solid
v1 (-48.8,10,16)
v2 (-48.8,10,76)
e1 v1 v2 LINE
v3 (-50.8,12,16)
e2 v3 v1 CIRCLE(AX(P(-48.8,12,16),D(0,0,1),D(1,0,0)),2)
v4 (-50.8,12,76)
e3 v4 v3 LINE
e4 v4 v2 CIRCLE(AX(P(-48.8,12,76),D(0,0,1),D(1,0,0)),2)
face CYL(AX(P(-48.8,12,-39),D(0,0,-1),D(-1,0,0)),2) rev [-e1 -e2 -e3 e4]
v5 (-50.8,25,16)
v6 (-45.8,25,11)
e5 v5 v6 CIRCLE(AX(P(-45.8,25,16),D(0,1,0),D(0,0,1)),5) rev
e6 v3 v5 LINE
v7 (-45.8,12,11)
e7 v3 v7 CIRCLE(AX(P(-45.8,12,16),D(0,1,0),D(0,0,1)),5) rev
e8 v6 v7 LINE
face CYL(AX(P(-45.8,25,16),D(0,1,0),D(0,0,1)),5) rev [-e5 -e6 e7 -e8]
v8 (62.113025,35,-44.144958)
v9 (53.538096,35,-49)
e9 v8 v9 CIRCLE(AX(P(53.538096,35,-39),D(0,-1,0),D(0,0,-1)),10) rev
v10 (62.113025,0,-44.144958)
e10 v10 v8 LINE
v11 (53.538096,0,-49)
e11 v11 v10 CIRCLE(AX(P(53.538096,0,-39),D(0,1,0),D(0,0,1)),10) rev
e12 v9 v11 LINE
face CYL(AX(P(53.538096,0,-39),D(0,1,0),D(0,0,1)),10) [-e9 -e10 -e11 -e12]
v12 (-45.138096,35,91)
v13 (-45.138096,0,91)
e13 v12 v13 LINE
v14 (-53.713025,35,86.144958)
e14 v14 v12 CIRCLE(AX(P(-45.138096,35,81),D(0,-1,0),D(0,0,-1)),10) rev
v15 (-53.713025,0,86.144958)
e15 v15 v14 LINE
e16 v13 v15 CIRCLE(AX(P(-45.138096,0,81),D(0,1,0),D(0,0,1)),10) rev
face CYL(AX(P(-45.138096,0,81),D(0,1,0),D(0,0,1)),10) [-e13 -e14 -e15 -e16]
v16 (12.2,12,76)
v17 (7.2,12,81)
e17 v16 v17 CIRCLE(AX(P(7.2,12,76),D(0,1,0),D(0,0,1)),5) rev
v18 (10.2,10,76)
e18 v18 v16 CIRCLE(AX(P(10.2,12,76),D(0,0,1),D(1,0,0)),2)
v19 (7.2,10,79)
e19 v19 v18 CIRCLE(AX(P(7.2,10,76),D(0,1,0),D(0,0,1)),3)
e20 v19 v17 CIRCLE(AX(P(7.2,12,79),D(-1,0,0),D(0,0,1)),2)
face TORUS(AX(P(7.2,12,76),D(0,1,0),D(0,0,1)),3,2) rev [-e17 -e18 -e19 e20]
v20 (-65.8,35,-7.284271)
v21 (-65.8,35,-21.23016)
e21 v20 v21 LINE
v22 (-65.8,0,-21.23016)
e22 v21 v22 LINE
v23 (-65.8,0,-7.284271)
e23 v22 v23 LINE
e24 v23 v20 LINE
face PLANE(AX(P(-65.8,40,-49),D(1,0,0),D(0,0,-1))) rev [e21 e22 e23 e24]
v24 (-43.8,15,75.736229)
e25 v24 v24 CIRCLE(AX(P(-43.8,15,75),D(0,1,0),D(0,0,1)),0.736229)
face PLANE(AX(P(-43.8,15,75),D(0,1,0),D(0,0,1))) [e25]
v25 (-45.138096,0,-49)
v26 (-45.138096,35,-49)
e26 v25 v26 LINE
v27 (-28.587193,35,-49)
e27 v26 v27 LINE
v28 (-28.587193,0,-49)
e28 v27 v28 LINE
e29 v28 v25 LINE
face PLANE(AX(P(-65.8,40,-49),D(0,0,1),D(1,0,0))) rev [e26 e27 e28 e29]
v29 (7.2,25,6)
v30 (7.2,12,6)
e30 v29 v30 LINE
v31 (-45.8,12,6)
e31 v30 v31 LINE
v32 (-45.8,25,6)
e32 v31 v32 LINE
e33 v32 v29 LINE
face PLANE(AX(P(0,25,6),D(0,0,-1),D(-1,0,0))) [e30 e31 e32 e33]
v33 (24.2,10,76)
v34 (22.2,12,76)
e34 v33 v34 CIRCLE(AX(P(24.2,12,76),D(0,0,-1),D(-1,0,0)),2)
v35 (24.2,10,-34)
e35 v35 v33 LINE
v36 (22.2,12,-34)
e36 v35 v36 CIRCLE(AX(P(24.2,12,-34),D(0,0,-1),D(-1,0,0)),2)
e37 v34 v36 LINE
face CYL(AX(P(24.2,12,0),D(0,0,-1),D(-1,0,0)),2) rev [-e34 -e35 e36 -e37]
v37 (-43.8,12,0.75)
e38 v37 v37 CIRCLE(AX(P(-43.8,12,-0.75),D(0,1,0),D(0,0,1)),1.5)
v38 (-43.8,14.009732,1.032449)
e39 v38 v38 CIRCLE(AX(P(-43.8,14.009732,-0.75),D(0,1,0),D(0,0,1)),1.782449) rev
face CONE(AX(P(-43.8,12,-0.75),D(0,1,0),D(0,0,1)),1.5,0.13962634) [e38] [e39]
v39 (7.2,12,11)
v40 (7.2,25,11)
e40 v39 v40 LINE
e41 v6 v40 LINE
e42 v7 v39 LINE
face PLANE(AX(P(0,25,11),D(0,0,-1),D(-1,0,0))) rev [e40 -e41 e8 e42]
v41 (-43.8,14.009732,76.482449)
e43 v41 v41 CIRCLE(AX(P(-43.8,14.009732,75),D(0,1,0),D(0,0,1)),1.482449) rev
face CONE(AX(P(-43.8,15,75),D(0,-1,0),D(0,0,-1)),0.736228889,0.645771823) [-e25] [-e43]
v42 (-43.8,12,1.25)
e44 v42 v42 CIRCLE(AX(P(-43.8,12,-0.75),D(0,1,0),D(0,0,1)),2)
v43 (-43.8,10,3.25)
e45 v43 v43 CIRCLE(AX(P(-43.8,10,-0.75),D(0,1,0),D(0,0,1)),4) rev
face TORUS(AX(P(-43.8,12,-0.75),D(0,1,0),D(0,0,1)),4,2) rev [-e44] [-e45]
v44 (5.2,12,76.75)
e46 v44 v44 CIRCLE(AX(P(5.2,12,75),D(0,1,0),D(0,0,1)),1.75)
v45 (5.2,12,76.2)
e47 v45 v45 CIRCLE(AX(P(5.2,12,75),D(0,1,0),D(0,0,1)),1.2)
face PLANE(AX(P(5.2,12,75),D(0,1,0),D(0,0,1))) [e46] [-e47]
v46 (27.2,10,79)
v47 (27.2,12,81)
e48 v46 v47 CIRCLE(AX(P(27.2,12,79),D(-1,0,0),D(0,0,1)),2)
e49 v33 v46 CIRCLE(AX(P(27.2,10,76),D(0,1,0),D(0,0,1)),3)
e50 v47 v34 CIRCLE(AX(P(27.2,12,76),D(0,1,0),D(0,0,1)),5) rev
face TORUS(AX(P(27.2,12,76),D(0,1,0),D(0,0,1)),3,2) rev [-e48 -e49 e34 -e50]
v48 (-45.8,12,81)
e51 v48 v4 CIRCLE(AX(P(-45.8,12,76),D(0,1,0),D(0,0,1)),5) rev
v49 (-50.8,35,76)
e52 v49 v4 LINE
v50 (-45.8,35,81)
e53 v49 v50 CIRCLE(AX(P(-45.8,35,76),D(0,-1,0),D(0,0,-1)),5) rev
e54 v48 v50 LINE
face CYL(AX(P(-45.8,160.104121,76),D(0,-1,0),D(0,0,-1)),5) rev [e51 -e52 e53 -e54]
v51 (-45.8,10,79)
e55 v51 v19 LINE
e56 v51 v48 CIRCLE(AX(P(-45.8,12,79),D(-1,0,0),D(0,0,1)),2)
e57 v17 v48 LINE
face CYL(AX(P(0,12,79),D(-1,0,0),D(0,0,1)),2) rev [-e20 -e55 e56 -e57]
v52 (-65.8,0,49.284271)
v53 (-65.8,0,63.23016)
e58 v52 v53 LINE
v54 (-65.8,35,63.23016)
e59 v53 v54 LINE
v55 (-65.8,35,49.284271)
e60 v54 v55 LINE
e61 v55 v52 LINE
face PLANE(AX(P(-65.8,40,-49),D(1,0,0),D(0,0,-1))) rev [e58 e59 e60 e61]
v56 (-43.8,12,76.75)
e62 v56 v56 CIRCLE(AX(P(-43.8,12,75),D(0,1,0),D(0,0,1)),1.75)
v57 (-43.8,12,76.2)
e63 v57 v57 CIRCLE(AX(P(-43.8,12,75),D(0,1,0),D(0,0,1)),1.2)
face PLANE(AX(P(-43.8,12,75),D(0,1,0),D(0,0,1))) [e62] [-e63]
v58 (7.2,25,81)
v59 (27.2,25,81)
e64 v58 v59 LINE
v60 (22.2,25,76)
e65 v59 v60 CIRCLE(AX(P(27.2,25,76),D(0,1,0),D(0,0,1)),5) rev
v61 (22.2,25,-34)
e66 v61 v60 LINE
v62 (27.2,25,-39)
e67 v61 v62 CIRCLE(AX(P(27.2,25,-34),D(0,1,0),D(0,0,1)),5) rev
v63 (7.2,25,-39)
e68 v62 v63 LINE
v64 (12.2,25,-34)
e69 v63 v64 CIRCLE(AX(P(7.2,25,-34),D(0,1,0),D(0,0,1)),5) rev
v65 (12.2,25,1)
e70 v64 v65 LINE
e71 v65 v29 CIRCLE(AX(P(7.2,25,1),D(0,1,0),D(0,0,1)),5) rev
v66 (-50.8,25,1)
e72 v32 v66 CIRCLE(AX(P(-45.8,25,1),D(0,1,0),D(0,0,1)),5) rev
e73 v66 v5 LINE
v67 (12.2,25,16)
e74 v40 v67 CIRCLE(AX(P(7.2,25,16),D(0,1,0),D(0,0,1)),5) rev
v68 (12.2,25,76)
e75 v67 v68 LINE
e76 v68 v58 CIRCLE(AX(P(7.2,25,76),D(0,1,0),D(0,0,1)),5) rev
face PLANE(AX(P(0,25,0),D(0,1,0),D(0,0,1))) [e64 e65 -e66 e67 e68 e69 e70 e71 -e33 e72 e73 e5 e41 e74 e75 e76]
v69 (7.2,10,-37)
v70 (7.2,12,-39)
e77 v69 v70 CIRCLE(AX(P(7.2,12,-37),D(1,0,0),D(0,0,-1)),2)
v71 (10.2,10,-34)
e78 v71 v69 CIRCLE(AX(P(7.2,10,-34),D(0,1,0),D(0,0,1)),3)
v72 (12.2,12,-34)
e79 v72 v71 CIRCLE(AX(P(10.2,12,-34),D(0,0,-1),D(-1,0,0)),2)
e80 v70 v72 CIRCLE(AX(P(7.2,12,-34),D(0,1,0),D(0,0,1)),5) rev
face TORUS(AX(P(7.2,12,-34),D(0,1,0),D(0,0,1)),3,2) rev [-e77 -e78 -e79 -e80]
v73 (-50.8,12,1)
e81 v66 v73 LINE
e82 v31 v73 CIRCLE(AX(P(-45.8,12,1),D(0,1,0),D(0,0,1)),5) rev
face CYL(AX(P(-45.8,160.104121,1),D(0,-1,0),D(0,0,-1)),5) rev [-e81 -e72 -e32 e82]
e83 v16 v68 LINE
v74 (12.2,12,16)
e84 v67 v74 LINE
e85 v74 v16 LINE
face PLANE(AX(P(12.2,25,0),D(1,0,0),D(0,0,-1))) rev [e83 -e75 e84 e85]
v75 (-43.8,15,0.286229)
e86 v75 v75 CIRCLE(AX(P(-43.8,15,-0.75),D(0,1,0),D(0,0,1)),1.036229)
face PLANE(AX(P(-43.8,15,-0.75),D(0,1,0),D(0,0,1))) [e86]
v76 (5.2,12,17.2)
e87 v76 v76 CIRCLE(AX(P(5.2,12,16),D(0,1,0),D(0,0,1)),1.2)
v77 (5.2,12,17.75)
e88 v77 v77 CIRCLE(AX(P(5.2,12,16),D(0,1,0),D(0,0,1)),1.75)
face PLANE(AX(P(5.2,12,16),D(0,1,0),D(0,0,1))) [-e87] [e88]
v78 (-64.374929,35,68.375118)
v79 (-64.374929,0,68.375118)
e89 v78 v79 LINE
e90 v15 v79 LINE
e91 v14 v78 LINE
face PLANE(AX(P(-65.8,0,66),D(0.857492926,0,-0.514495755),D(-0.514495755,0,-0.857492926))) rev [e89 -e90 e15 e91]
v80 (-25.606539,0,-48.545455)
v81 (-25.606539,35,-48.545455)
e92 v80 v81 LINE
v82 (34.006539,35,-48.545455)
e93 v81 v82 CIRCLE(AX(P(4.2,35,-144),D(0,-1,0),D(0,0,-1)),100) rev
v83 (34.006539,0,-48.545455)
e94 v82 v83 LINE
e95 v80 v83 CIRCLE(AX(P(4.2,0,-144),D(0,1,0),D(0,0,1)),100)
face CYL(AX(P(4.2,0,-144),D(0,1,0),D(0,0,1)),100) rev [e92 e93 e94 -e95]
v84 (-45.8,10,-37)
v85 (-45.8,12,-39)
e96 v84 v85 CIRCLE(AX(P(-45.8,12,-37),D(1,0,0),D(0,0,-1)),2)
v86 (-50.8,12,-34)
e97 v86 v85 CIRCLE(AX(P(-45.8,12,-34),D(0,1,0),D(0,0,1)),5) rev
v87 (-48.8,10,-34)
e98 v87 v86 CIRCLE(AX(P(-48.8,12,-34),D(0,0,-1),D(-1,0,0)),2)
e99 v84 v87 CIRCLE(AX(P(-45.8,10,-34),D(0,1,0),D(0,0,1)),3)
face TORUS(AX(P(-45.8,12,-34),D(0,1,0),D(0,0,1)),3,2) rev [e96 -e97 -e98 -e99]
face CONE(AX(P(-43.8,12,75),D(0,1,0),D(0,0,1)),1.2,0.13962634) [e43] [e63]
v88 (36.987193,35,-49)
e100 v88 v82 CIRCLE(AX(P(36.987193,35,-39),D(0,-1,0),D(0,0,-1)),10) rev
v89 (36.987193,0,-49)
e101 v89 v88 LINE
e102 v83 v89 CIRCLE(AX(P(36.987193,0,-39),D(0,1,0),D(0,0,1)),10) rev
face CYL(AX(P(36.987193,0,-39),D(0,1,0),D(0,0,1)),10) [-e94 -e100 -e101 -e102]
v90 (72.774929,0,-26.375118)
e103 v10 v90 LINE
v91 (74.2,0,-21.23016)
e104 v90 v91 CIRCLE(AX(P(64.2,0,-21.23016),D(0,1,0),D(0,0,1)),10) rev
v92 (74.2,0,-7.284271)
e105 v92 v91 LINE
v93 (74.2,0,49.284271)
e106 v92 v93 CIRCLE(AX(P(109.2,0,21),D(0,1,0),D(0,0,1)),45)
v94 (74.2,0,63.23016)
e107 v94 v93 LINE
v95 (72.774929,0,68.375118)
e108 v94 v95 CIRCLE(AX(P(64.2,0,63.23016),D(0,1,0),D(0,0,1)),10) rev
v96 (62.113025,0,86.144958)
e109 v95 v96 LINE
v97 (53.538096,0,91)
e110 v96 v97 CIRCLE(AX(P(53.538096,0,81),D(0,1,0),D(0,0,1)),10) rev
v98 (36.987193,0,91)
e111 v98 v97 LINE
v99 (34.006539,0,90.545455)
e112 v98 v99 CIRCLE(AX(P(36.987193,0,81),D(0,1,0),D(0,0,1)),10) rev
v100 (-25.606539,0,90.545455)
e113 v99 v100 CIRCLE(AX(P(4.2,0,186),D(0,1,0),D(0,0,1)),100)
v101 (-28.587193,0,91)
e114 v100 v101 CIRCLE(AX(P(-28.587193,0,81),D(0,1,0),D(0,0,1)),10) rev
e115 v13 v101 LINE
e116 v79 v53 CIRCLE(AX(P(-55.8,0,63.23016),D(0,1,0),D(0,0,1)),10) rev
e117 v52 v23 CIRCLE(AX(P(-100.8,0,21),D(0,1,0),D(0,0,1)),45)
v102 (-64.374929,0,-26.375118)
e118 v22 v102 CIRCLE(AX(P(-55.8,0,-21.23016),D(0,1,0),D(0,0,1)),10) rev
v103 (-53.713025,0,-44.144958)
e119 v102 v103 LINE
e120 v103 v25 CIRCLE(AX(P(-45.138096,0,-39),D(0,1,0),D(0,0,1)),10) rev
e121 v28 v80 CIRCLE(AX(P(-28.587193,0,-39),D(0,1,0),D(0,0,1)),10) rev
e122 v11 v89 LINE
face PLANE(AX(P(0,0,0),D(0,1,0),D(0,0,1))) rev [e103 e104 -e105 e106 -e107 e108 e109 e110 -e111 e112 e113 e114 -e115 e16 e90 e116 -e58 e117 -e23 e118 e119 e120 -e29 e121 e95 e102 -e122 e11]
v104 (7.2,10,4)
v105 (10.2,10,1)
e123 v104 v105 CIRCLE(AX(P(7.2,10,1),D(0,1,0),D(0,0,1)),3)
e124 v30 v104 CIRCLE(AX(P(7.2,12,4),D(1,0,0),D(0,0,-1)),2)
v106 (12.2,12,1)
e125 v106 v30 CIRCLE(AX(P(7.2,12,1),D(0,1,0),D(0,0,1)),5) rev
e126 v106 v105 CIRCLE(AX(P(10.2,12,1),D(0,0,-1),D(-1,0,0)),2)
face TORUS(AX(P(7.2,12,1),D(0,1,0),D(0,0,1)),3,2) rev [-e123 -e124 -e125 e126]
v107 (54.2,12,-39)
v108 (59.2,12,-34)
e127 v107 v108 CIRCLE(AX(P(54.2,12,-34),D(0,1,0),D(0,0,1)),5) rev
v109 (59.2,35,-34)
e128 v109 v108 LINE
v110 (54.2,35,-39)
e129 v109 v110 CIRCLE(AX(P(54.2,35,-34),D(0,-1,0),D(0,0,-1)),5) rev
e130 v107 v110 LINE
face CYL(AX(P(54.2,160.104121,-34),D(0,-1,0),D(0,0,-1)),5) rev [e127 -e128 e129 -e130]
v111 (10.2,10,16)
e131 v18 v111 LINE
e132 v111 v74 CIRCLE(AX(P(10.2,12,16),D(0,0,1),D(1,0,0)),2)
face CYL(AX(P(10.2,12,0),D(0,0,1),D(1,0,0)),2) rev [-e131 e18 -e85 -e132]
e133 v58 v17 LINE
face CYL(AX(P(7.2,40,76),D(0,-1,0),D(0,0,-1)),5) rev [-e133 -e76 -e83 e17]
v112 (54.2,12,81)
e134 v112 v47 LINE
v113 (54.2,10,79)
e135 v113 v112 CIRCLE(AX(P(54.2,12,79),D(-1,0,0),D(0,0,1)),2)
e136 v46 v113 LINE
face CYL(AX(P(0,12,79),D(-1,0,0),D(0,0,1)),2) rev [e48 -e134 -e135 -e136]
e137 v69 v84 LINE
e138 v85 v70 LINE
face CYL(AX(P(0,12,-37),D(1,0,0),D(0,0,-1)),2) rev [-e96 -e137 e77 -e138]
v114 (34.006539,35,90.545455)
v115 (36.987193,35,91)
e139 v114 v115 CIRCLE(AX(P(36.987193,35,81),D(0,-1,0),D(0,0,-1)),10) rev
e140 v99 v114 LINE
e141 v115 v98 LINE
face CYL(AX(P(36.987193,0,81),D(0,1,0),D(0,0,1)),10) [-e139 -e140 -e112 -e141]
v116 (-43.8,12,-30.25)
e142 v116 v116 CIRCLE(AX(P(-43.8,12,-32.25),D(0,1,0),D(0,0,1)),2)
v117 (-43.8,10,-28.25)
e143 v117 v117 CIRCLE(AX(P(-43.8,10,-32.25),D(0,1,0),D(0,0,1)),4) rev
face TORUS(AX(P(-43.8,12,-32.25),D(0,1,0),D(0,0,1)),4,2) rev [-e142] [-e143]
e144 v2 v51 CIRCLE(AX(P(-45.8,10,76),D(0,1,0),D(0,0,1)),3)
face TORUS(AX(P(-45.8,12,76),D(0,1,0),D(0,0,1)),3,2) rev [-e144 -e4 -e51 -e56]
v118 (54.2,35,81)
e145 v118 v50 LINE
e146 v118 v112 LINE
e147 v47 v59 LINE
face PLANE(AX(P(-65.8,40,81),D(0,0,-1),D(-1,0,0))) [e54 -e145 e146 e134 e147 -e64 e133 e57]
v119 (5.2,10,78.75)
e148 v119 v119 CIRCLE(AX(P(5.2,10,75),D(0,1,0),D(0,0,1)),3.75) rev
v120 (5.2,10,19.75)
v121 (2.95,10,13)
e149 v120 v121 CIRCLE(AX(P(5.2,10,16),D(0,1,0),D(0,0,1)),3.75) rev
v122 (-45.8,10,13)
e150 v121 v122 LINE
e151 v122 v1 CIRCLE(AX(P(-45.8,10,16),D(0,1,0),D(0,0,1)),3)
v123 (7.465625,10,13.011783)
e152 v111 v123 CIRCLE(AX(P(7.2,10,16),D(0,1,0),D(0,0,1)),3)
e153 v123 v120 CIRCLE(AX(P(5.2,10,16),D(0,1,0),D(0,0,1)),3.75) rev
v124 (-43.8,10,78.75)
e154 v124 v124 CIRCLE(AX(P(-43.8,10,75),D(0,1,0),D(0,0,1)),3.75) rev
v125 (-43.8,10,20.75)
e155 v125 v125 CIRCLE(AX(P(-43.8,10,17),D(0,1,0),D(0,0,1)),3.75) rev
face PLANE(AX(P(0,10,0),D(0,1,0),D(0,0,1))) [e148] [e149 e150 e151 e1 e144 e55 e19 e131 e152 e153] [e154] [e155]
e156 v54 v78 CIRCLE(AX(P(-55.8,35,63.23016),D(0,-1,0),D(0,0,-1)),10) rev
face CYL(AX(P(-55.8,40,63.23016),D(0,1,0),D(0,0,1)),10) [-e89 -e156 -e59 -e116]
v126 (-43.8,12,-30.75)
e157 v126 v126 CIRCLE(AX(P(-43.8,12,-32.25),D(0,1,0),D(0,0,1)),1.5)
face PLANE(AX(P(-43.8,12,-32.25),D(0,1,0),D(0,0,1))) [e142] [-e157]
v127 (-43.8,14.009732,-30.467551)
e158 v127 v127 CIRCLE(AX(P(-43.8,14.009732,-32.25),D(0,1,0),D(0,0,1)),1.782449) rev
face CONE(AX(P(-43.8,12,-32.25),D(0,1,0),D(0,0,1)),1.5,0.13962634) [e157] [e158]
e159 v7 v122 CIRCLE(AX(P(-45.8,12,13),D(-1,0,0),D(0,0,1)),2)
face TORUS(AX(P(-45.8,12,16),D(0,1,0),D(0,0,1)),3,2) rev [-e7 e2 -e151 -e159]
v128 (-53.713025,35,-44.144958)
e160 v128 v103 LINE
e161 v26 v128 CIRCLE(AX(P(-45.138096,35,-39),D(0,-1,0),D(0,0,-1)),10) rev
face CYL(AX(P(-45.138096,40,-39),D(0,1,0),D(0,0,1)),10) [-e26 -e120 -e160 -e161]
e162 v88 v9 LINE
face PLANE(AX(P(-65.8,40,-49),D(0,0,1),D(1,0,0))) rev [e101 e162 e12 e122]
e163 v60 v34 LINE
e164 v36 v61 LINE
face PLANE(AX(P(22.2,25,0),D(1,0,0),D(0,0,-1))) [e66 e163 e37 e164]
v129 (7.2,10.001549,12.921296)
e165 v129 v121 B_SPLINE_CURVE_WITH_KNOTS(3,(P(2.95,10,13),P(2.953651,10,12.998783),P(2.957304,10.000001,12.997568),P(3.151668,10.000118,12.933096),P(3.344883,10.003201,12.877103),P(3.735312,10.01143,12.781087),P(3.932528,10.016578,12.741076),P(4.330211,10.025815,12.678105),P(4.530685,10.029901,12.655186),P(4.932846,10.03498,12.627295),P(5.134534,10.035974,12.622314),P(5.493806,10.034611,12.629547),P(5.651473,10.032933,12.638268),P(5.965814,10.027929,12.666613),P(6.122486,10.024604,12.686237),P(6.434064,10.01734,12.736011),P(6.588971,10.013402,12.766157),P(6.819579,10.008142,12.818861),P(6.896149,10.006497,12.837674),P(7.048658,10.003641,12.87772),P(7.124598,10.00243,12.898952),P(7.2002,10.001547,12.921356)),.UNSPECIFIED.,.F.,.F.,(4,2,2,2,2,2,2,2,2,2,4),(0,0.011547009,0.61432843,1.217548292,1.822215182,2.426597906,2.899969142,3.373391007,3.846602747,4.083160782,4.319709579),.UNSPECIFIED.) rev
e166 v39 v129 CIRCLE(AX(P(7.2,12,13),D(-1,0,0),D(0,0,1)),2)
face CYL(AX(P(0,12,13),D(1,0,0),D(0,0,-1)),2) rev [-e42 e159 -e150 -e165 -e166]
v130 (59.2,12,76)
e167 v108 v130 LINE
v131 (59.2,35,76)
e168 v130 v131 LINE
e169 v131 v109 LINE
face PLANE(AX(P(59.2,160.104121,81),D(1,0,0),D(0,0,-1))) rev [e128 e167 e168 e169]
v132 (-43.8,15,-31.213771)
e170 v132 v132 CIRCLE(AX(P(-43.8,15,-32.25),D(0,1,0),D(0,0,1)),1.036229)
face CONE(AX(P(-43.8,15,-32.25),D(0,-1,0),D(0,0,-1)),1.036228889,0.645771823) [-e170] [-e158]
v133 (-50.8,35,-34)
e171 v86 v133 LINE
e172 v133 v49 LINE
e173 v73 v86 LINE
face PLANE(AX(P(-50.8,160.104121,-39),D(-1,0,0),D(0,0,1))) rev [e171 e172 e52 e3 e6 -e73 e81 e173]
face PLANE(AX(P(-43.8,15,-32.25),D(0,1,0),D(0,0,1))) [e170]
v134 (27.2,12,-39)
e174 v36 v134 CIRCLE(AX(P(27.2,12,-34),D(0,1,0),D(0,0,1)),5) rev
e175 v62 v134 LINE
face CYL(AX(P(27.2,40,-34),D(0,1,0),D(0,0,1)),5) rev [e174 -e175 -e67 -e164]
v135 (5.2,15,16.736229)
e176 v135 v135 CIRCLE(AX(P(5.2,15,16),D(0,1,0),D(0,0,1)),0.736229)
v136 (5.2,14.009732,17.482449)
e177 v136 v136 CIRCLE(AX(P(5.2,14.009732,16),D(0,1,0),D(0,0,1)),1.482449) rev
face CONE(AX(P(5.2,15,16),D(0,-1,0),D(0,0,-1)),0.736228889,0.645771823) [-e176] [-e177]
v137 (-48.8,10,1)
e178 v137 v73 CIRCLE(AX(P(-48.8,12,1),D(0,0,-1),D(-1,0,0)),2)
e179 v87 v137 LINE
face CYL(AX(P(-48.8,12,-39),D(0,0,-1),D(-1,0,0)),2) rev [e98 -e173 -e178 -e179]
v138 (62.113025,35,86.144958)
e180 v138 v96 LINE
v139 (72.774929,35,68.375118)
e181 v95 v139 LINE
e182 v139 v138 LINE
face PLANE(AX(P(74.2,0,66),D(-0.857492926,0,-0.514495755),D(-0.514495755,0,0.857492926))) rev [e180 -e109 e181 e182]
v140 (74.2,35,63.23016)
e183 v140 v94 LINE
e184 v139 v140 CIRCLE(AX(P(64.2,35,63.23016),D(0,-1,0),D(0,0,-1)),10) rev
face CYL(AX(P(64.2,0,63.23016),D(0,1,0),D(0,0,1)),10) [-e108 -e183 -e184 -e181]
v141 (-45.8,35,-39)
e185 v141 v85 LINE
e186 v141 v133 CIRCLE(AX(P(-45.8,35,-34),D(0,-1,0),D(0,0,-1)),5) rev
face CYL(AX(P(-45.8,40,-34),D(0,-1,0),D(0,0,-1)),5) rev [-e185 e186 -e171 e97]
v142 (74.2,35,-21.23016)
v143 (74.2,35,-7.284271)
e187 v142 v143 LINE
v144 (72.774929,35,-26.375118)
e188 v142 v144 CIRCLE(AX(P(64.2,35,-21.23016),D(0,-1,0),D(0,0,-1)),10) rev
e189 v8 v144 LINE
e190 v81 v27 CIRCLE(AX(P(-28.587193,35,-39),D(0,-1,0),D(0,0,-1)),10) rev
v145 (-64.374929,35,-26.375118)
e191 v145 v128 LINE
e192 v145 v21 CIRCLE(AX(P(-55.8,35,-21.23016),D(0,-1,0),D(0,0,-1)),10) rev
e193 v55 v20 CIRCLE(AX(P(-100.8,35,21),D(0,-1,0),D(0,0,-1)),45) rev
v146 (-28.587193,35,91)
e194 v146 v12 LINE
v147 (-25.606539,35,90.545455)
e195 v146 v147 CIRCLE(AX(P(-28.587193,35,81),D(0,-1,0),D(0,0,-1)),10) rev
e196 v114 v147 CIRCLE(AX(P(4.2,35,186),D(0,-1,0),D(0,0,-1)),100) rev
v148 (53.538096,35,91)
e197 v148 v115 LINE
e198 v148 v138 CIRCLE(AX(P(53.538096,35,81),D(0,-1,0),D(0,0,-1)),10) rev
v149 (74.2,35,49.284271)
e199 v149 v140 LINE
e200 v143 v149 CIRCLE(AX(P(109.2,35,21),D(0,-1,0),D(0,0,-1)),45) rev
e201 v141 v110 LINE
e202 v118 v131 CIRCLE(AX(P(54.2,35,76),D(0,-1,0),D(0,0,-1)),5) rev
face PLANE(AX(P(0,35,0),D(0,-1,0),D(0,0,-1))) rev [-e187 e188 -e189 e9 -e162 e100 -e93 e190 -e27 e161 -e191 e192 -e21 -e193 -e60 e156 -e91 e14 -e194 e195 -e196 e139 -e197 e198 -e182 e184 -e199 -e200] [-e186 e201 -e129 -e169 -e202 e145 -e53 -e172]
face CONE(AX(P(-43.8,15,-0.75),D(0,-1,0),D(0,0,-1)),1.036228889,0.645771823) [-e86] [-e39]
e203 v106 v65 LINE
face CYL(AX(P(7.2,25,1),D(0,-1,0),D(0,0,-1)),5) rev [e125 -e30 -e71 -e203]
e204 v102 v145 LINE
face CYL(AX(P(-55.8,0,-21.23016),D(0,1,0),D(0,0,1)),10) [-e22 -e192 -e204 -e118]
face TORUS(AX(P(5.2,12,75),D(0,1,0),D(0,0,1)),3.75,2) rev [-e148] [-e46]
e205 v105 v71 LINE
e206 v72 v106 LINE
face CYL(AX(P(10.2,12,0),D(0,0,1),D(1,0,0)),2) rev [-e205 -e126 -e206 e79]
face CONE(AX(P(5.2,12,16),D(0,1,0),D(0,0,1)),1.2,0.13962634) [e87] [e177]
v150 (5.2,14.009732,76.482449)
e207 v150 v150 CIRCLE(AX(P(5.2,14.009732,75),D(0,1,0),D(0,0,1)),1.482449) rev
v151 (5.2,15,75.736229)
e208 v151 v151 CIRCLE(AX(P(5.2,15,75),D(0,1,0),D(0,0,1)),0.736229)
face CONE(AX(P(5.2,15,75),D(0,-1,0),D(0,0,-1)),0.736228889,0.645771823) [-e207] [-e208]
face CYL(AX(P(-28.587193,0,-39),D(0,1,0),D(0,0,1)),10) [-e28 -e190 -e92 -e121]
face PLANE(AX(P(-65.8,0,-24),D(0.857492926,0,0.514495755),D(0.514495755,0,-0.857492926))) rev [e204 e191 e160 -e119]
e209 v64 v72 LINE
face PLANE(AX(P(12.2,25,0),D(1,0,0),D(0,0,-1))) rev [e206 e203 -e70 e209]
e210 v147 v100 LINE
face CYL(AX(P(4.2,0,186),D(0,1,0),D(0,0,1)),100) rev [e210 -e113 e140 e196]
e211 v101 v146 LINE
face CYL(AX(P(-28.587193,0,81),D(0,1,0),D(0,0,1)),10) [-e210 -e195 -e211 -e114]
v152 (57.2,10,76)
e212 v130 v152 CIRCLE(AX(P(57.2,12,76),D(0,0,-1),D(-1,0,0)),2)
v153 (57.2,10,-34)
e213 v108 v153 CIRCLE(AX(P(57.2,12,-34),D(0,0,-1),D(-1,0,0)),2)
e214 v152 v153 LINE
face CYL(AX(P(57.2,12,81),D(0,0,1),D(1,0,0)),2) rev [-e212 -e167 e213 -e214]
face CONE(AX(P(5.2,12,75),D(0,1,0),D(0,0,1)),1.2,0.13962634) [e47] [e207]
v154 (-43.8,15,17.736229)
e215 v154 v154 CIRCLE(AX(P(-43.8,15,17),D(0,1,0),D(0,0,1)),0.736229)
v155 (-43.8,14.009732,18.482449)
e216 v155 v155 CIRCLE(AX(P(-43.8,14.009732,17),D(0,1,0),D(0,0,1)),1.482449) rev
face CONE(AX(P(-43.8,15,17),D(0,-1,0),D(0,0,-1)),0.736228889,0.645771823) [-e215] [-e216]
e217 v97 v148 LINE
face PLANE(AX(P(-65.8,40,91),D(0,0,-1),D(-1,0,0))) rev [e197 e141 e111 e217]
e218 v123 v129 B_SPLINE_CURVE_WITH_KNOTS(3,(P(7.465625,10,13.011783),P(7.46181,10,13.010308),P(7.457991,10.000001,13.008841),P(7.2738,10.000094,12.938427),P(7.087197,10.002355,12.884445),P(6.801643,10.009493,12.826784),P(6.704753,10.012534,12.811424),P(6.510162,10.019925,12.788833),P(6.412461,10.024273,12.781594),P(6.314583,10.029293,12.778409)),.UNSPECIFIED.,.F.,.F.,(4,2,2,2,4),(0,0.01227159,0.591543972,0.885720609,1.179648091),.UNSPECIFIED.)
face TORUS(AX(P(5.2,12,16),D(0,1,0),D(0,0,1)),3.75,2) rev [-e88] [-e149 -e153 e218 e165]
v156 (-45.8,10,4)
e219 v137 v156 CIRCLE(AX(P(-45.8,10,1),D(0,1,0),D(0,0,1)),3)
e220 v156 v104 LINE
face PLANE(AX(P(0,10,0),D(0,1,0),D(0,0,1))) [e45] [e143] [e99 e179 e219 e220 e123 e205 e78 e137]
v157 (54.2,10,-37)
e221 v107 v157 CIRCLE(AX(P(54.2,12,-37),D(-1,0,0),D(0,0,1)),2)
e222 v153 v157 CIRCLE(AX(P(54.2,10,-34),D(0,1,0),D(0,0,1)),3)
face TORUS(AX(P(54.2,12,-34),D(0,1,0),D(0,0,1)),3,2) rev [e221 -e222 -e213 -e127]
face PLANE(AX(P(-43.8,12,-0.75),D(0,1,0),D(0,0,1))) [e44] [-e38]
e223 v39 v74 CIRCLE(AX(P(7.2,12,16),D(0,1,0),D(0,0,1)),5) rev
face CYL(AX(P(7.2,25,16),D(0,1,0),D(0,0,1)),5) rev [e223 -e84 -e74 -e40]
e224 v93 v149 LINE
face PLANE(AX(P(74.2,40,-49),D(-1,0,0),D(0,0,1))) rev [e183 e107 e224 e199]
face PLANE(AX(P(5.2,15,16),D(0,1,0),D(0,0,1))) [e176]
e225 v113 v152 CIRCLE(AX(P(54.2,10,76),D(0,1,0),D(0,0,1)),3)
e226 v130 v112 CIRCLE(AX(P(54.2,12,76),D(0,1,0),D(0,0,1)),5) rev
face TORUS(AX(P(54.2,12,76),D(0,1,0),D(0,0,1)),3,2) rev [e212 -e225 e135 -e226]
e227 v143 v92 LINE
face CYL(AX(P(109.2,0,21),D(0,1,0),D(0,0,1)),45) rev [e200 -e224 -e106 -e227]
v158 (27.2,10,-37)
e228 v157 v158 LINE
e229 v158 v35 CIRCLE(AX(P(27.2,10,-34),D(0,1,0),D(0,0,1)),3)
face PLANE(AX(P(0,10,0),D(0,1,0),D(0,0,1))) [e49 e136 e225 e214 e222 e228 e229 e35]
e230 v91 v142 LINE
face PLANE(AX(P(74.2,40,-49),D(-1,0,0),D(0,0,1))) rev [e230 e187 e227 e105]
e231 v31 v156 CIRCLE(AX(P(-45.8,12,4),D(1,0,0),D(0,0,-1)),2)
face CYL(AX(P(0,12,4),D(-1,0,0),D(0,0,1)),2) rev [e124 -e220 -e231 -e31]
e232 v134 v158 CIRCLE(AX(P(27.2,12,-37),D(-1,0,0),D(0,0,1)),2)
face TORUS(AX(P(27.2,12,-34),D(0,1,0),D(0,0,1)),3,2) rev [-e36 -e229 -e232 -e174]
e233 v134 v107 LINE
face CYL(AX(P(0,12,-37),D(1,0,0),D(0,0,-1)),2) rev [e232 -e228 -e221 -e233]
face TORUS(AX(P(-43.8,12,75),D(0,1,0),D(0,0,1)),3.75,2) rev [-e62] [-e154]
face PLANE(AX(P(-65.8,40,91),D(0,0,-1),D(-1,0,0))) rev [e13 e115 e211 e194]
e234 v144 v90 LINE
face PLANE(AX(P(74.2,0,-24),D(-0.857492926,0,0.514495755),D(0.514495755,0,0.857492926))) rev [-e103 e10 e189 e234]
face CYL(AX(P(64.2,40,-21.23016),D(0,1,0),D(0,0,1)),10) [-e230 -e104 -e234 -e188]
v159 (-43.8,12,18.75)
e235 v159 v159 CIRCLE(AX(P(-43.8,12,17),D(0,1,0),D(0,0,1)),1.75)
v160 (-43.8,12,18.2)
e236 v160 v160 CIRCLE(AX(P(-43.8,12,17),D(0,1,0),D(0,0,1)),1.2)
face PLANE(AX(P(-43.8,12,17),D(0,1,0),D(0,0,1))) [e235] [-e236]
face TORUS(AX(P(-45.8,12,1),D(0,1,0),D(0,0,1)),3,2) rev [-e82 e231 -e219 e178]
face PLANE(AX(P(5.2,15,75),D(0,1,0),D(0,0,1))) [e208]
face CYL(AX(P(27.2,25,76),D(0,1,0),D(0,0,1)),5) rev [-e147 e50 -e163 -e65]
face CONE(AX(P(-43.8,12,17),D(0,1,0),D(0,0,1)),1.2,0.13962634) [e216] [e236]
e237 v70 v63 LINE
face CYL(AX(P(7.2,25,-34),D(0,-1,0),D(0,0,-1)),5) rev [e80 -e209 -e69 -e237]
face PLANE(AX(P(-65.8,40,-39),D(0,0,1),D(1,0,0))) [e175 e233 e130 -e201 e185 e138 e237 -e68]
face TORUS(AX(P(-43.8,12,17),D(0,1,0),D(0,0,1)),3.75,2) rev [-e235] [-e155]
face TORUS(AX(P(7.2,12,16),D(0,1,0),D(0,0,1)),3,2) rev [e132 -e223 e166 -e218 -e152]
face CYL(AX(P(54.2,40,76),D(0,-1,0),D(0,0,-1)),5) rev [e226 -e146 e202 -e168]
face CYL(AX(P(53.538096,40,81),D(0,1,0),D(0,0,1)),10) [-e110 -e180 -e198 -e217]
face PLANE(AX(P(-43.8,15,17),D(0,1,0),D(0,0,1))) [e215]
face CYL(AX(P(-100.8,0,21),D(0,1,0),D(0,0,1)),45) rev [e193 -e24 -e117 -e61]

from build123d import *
from OCP.BRepFilletAPI import BRepFilletAPI_MakeChamfer

# Parameters (mm, degrees)
SKETCH1_W                     = 140
SKETCH1_H                     = 140
BOSS_EXTRUDE1_DEPTH           = 40
SHELL3_T                      = -10
SKETCH3_W                     = 5
SKETCH3_H                     = 120
BOSS_EXTRUDE2_DEPTH           = 30
CUT_EXTRUDE1_DEPTH            = 40
FILLET1_R                     = 10
SKETCH5_R                     = 45
SKETCH5_R_2                   = 100
CUT_EXTRUDE4_DEPTH            = 40
FILLET2_R                     = 10
SKETCH6_W                     = 63
SKETCH6_H                     = 5
BOSS_EXTRUDE3_DEPTH           = 15
FILLET4_R                     = 5
SKETCH7_R                     = 1.75
SKETCH7_R_2                   = 2
BOSS_EXTRUDE4_DEPTH           = 2
SKETCH8_R                     = 1.5
BOSS_EXTRUDE5_DEPTH           = 3
BOSS_EXTRUDE5_DRAFT           = -8
BOSS_EXTRUDE5_PROFILE_2_DEPTH = 3
BOSS_EXTRUDE5_PROFILE_2_DRAFT = -8
SKETCH8_R_2                   = 1.2
BOSS_EXTRUDE5_PROFILE_3_DEPTH = 3
BOSS_EXTRUDE5_PROFILE_3_DRAFT = -8
BOSS_EXTRUDE5_PROFILE_4_DEPTH = 3
BOSS_EXTRUDE5_PROFILE_4_DRAFT = -8
BOSS_EXTRUDE5_PROFILE_5_DEPTH = 3
BOSS_EXTRUDE5_PROFILE_5_DRAFT = -8
BOSS_EXTRUDE5_PROFILE_6_DEPTH = 3
BOSS_EXTRUDE5_PROFILE_6_DRAFT = -8
CHAMFER1_SIZE                 = 1
CHAMFER1_SIZE2                = 0.885393615
FILLET7_R                     = 2
CUT_EXTRUDE5_DEPTH            = 5


with BuildPart() as part:
    # Sketch1 → Boss-Extrude1 (new body)
    with BuildSketch(Plane(origin=(0, 0, 0), x_dir=(1, 0, 0), z_dir=(0, 1, 0))):
        with Locations((4.2, -21)):
            Rectangle(SKETCH1_W, SKETCH1_H)
    extrude(amount=BOSS_EXTRUDE1_DEPTH)

    # Shell3
    shell3_openings = [part.faces().sort_by_distance(p)[0] for p in [
        (4.2, 40, 21),
    ]]
    offset(amount=SHELL3_T, openings=shell3_openings, kind=Kind.INTERSECTION)

    # Sketch3 → Boss-Extrude2 (add)
    with BuildSketch(Plane(origin=(0, 10, 0), x_dir=(1, 0, 0), z_dir=(0, 1, 0))):
        with Locations((-53.3, -21)):
            Rectangle(SKETCH3_W, SKETCH3_H)
        with Locations((61.7, -21)):
            Rectangle(SKETCH3_W, SKETCH3_H)
    extrude(amount=BOSS_EXTRUDE2_DEPTH)

    # Sketch4 → Cut-Extrude1 (cut)
    with BuildSketch(Plane(origin=(0, 40, 0), x_dir=(1, 0, 0), z_dir=(0, 1, 0))):
        Polygon((-65.8, 24), (-50.8, 49), (-65.8, 49), align=None)
        Polygon((59.2, 49), (74.2, 49), (74.2, 24), align=None)
        Polygon((74.2, -91), (74.2, -66), (59.2, -91), align=None)
        Polygon((-65.8, -66), (-50.8, -91), (-65.8, -91), align=None)
    extrude(amount=-CUT_EXTRUDE1_DEPTH, mode=Mode.SUBTRACT)

    # Fillet1
    fillet1_edges = [part.edges().sort_by_distance(p)[0] for p in [
        (-65.8, 20, -24),
        (-50.8, 20, -49),
        (74.2, 20, -24),
        (59.2, 20, -49),
        (59.2, 20, 91),
        (74.2, 20, 66),
        (-65.8, 20, 66),
        (-50.8, 20, 91),
    ]]
    fillet(fillet1_edges, radius=FILLET1_R)

    # Sketch5 → Cut-Extrude4 (cut)
    with BuildSketch(Plane(origin=(0, 40, 0), x_dir=(1, 0, 0), z_dir=(0, 1, 0))):
        with Locations((-100.8, -21)):
            Circle(SKETCH5_R)
        with Locations((109.2, -21)):
            Circle(SKETCH5_R)
        with Locations((4.2, 144)):
            Circle(SKETCH5_R_2)
        with Locations((4.2, -186)):
            Circle(SKETCH5_R_2)
    extrude(amount=-CUT_EXTRUDE4_DEPTH, mode=Mode.SUBTRACT)

    # Fillet2
    fillet2_edges = [part.edges().sort_by_distance(p)[0] for p in [
        (35.424989992, 20, -49),
        (-27.024989992, 20, -49),
        (-27.024989992, 20, 91),
        (35.424989992, 20, 91),
    ]]
    fillet(fillet2_edges, radius=FILLET2_R)

    # Sketch6 → Boss-Extrude3 (add)
    with BuildSketch(Plane(origin=(0, 10, 0), x_dir=(1, 0, 0), z_dir=(0, 1, 0))):
        with Locations((-19.3, -8.5)):
            Rectangle(SKETCH6_W, SKETCH6_H)
        Polygon((12.2, 39), (12.2, -6), (12.2, -11), (12.2, -81), (22.2, -81), (22.2, 39), align=None)
    extrude(amount=BOSS_EXTRUDE3_DEPTH)

    # Fillet4
    fillet4_edges = [part.edges().sort_by_distance(p)[0] for p in [
        (-50.8, 17.5, 11),
        (12.2, 17.5, 11),
        (12.2, 17.5, 81),
        (22.2, 17.5, 81),
        (22.2, 17.5, -39),
        (12.2, 17.5, -39),
        (12.2, 17.5, 6),
        (-50.8, 17.5, 6),
        (-50.8, 25, 81),
        (-50.8, 25, -39),
        (59.2, 25, -39),
        (59.2, 25, 81),
    ]]
    fillet(fillet4_edges, radius=FILLET4_R)

    # Sketch7 → Boss-Extrude4 (add)
    with BuildSketch(Plane(origin=(0, 10, 0), x_dir=(1, 0, 0), z_dir=(0, 1, 0))):
        with Locations(Location((-43.8, -75, 0), (0, 0, 270))):
            Circle(SKETCH7_R)
        with Locations(Location((5.2, -75, 0), (0, 0, 270))):
            Circle(SKETCH7_R)
        with Locations(Location((-43.8, -17, 0), (0, 0, 270))):
            Circle(SKETCH7_R)
        with Locations(Location((5.2, -16, 0), (0, 0, 270))):
            Circle(SKETCH7_R)
        with Locations(Location((-43.8, 0.75, 0), (0, 0, 270))):
            Circle(SKETCH7_R_2)
        with Locations(Location((-43.8, 32.25, 0), (0, 0, 270))):
            Circle(SKETCH7_R_2)
    extrude(amount=BOSS_EXTRUDE4_DEPTH)


with BuildPart() as boss_extrude5_tool:
    # Sketch8 → Boss-Extrude5 (with draft: the straight prism first)
    with BuildSketch(Plane(origin=(0, 12, 0), x_dir=(1, 0, 0), z_dir=(0, 1, 0))):
        with Locations((-43.8, 32.25)):
            Circle(SKETCH8_R)
    extrude(amount=BOSS_EXTRUDE5_DEPTH)
    # Boss-Extrude5: the draft: its side faces are tilted about the plane it starts from
    boss_extrude5_sides = [boss_extrude5_tool.faces().sort_by_distance(p)[0] for p in [
        (-45.3, 13.5, -32.25),
    ]]
    draft(boss_extrude5_sides, Plane(origin=(0, 12, 0), x_dir=(1, 0, 0), z_dir=(0, 1, 0)), BOSS_EXTRUDE5_DRAFT)


with BuildPart() as part_1:
    add(part.part)

    # Boss-Extrude5: add boss_extrude5_tool
    add(boss_extrude5_tool.part)


with BuildPart() as boss_extrude5_profile_2_tool:
    # Sketch8 → Boss-Extrude5 profile 2 (with draft: the straight prism first)
    with BuildSketch(Plane(origin=(0, 12, 0), x_dir=(1, 0, 0), z_dir=(0, 1, 0))):
        with Locations((-43.8, 0.75)):
            Circle(SKETCH8_R)
    extrude(amount=BOSS_EXTRUDE5_PROFILE_2_DEPTH)
    # Boss-Extrude5 profile 2: the draft: its side faces are tilted about the plane it starts from
    boss_extrude5_profile_2_sides = [boss_extrude5_profile_2_tool.faces().sort_by_distance(p)[0] for p in [
        (-45.3, 13.5, -0.75),
    ]]
    draft(boss_extrude5_profile_2_sides, Plane(origin=(0, 12, 0), x_dir=(1, 0, 0), z_dir=(0, 1, 0)), BOSS_EXTRUDE5_PROFILE_2_DRAFT)


with BuildPart() as part_2:
    add(part_1.part)

    # Boss-Extrude5 profile 2: add boss_extrude5_profile_2_tool
    add(boss_extrude5_profile_2_tool.part)


with BuildPart() as boss_extrude5_profile_3_tool:
    # Sketch8 → Boss-Extrude5 profile 3 (with draft: the straight prism first)
    with BuildSketch(Plane(origin=(0, 12, 0), x_dir=(1, 0, 0), z_dir=(0, 1, 0))):
        with Locations((-43.8, -17)):
            Circle(SKETCH8_R_2)
    extrude(amount=BOSS_EXTRUDE5_PROFILE_3_DEPTH)
    # Boss-Extrude5 profile 3: the draft: its side faces are tilted about the plane it starts from
    boss_extrude5_profile_3_sides = [boss_extrude5_profile_3_tool.faces().sort_by_distance(p)[0] for p in [
        (-45, 13.5, 17),
    ]]
    draft(boss_extrude5_profile_3_sides, Plane(origin=(0, 12, 0), x_dir=(1, 0, 0), z_dir=(0, 1, 0)), BOSS_EXTRUDE5_PROFILE_3_DRAFT)


with BuildPart() as part_3:
    add(part_2.part)

    # Boss-Extrude5 profile 3: add boss_extrude5_profile_3_tool
    add(boss_extrude5_profile_3_tool.part)


with BuildPart() as boss_extrude5_profile_4_tool:
    # Sketch8 → Boss-Extrude5 profile 4 (with draft: the straight prism first)
    with BuildSketch(Plane(origin=(0, 12, 0), x_dir=(1, 0, 0), z_dir=(0, 1, 0))):
        with Locations((5.2, -16)):
            Circle(SKETCH8_R_2)
    extrude(amount=BOSS_EXTRUDE5_PROFILE_4_DEPTH)
    # Boss-Extrude5 profile 4: the draft: its side faces are tilted about the plane it starts from
    boss_extrude5_profile_4_sides = [boss_extrude5_profile_4_tool.faces().sort_by_distance(p)[0] for p in [
        (4, 13.5, 16),
    ]]
    draft(boss_extrude5_profile_4_sides, Plane(origin=(0, 12, 0), x_dir=(1, 0, 0), z_dir=(0, 1, 0)), BOSS_EXTRUDE5_PROFILE_4_DRAFT)


with BuildPart() as part_4:
    add(part_3.part)

    # Boss-Extrude5 profile 4: add boss_extrude5_profile_4_tool
    add(boss_extrude5_profile_4_tool.part)


with BuildPart() as boss_extrude5_profile_5_tool:
    # Sketch8 → Boss-Extrude5 profile 5 (with draft: the straight prism first)
    with BuildSketch(Plane(origin=(0, 12, 0), x_dir=(1, 0, 0), z_dir=(0, 1, 0))):
        with Locations((5.2, -75)):
            Circle(SKETCH8_R_2)
    extrude(amount=BOSS_EXTRUDE5_PROFILE_5_DEPTH)
    # Boss-Extrude5 profile 5: the draft: its side faces are tilted about the plane it starts from
    boss_extrude5_profile_5_sides = [boss_extrude5_profile_5_tool.faces().sort_by_distance(p)[0] for p in [
        (4, 13.5, 75),
    ]]
    draft(boss_extrude5_profile_5_sides, Plane(origin=(0, 12, 0), x_dir=(1, 0, 0), z_dir=(0, 1, 0)), BOSS_EXTRUDE5_PROFILE_5_DRAFT)


with BuildPart() as part_5:
    add(part_4.part)

    # Boss-Extrude5 profile 5: add boss_extrude5_profile_5_tool
    add(boss_extrude5_profile_5_tool.part)


with BuildPart() as boss_extrude5_profile_6_tool:
    # Sketch8 → Boss-Extrude5 profile 6 (with draft: the straight prism first)
    with BuildSketch(Plane(origin=(0, 12, 0), x_dir=(1, 0, 0), z_dir=(0, 1, 0))):
        with Locations((-43.8, -75)):
            Circle(SKETCH8_R_2)
    extrude(amount=BOSS_EXTRUDE5_PROFILE_6_DEPTH)
    # Boss-Extrude5 profile 6: the draft: its side faces are tilted about the plane it starts from
    boss_extrude5_profile_6_sides = [boss_extrude5_profile_6_tool.faces().sort_by_distance(p)[0] for p in [
        (-45, 13.5, 75),
    ]]
    draft(boss_extrude5_profile_6_sides, Plane(origin=(0, 12, 0), x_dir=(1, 0, 0), z_dir=(0, 1, 0)), BOSS_EXTRUDE5_PROFILE_6_DRAFT)


with BuildPart() as part_6:
    add(part_5.part)

    # Boss-Extrude5 profile 6: add boss_extrude5_profile_6_tool
    add(boss_extrude5_profile_6_tool.part)

    # Chamfer1: one chamfer whose edges measure the first distance from different faces: ONE call of the kernel's chamfer builder (chamfer() names one face for all edges)
    chamfer1_edges_1 = [part_6.edges().sort_by_distance(p)[0] for p in [
        (-45.721622504, 15, -32.25),
    ]]
    chamfer1_side_1 = [part_6.faces().sort_by_distance(p)[0] for p in [
        (-45.510811252, 13.5, -32.25),
    ]]
    chamfer1_edges_2 = [part_6.edges().sort_by_distance(p)[0] for p in [
        (-45.721622504, 15, -0.75),
    ]]
    chamfer1_side_2 = [part_6.faces().sort_by_distance(p)[0] for p in [
        (-45.510811252, 13.5, -0.75),
    ]]
    chamfer1_edges_3 = [part_6.edges().sort_by_distance(p)[0] for p in [
        (-45.421622504, 15, 17),
    ]]
    chamfer1_side_3 = [part_6.faces().sort_by_distance(p)[0] for p in [
        (-45.210811252, 13.5, 17),
    ]]
    chamfer1_edges_4 = [part_6.edges().sort_by_distance(p)[0] for p in [
        (3.578377496, 15, 16),
    ]]
    chamfer1_side_4 = [part_6.faces().sort_by_distance(p)[0] for p in [
        (3.789188748, 13.5, 16),
    ]]
    chamfer1_edges_5 = [part_6.edges().sort_by_distance(p)[0] for p in [
        (3.578377496, 15, 75),
    ]]
    chamfer1_side_5 = [part_6.faces().sort_by_distance(p)[0] for p in [
        (3.789188748, 13.5, 75),
    ]]
    chamfer1_edges_6 = [part_6.edges().sort_by_distance(p)[0] for p in [
        (-45.421622504, 15, 75),
    ]]
    chamfer1_side_6 = [part_6.faces().sort_by_distance(p)[0] for p in [
        (-45.210811252, 13.5, 75),
    ]]
    chamfer1 = BRepFilletAPI_MakeChamfer(part_6.part.solid().wrapped)
    for e in chamfer1_edges_1:
        chamfer1.Add(CHAMFER1_SIZE, CHAMFER1_SIZE2, e.wrapped, chamfer1_side_1[0].wrapped)  # the first distance lies on this face
    for e in chamfer1_edges_2:
        chamfer1.Add(CHAMFER1_SIZE, CHAMFER1_SIZE2, e.wrapped, chamfer1_side_2[0].wrapped)  # the first distance lies on this face
    for e in chamfer1_edges_3:
        chamfer1.Add(CHAMFER1_SIZE, CHAMFER1_SIZE2, e.wrapped, chamfer1_side_3[0].wrapped)  # the first distance lies on this face
    for e in chamfer1_edges_4:
        chamfer1.Add(CHAMFER1_SIZE, CHAMFER1_SIZE2, e.wrapped, chamfer1_side_4[0].wrapped)  # the first distance lies on this face
    for e in chamfer1_edges_5:
        chamfer1.Add(CHAMFER1_SIZE, CHAMFER1_SIZE2, e.wrapped, chamfer1_side_5[0].wrapped)  # the first distance lies on this face
    for e in chamfer1_edges_6:
        chamfer1.Add(CHAMFER1_SIZE, CHAMFER1_SIZE2, e.wrapped, chamfer1_side_6[0].wrapped)  # the first distance lies on this face
    add(Compound.cast(chamfer1.Shape()), mode=Mode.REPLACE)

    # Fillet7
    # the kernel refuses this fillet: 2 mm, written as the material it adds along each edge
    with BuildSketch(Plane(origin=(59.2, 10, 76), x_dir=(-1, 0, 0), z_dir=(0, 0, -1))) as fillet7_piece_1:
        with BuildLine():
            CenterArc((FILLET7_R, FILLET7_R), FILLET7_R, 180, 90)
            Line((0, FILLET7_R), (0, 0))
            Line((0, 0), (FILLET7_R, 0))
        make_face()
    extrude(amount=110)
    with BuildSketch(Plane(origin=(22.2, 10, 76), x_dir=(1, 0, 0), z_dir=(0, 0, -1))) as fillet7_piece_2:
        with BuildLine():
            CenterArc((FILLET7_R, -FILLET7_R), FILLET7_R, 90, 90)
            Line((0, -FILLET7_R), (0, 0))
            Line((0, 0), (FILLET7_R, 0))
        make_face()
    extrude(amount=110)
    with BuildSketch(Plane(origin=(27.2, 10, 81), x_dir=(0, 0, -1), z_dir=(1, 0, 0))) as fillet7_piece_3:
        with BuildLine():
            CenterArc((FILLET7_R, FILLET7_R), FILLET7_R, 180, 90)
            Line((0, FILLET7_R), (0, 0))
            Line((0, 0), (FILLET7_R, 0))
        make_face()
    extrude(amount=27)
    with BuildSketch(Plane(origin=(54.2, 10, -39), x_dir=(0, 1, 0), z_dir=(-1, 0, 0))) as fillet7_piece_4:
        with BuildLine():
            CenterArc((FILLET7_R, -FILLET7_R), FILLET7_R, 90, 90)
            Line((0, -FILLET7_R), (0, 0))
            Line((0, 0), (FILLET7_R, 0))
        make_face()
    extrude(amount=27)
    with BuildSketch(Plane(origin=(27.2, 10, 76), x_dir=(0, 0, 1), z_dir=(1, 0, 0))) as fillet7_piece_5:
        with BuildLine():
            CenterArc((5 - FILLET7_R, -FILLET7_R), FILLET7_R, 0, 90)
            Line((5, -FILLET7_R), (5, 0))
            Line((5, 0), (5 - FILLET7_R, 0))
        make_face()
    revolve(axis=Axis((27.2, 10, 76), (0, -1, 0)), revolution_arc=90)
    with BuildSketch(Plane(origin=(54.2, 10, 76), x_dir=(0, 0, 1), z_dir=(-1, 0, 0))) as fillet7_piece_6:
        with BuildLine():
            CenterArc((5 - FILLET7_R, FILLET7_R), FILLET7_R, 270, 90)
            Line((5, FILLET7_R), (5, 0))
            Line((5, 0), (5 - FILLET7_R, 0))
        make_face()
    revolve(axis=Axis((54.2, 10, 76), (0, 1, 0)), revolution_arc=90)
    with BuildSketch(Plane(origin=(27.2, 10, -34), x_dir=(0, 0, -1), z_dir=(1, 0, 0))) as fillet7_piece_7:
        with BuildLine():
            CenterArc((5 - FILLET7_R, FILLET7_R), FILLET7_R, 270, 90)
            Line((5, FILLET7_R), (5, 0))
            Line((5, 0), (5 - FILLET7_R, 0))
        make_face()
    revolve(axis=Axis((27.2, 10, -34), (0, 1, 0)), revolution_arc=90)
    with BuildSketch(Plane(origin=(54.2, 10, -34), x_dir=(0, 0, -1), z_dir=(-1, 0, 0))) as fillet7_piece_8:
        with BuildLine():
            CenterArc((5 - FILLET7_R, -FILLET7_R), FILLET7_R, 0, 90)
            Line((5 - FILLET7_R, 0), (5, 0))
            Line((5, 0), (5, -FILLET7_R))
        make_face()
    revolve(axis=Axis((54.2, 10, -34), (0, -1, 0)), revolution_arc=90)
    with BuildSketch(Plane(origin=(7.2, 10, -39), x_dir=(0, 0, 1), z_dir=(-1, 0, 0)), Plane(origin=(-45.8, 10, 81), x_dir=(0, 0, -1), z_dir=(1, 0, 0))) as fillet7_piece_9:
        with BuildLine():
            CenterArc((FILLET7_R, FILLET7_R), FILLET7_R, 180, 90)
            Line((0, FILLET7_R), (0, 0))
            Line((0, 0), (FILLET7_R, 0))
        make_face()
    extrude(amount=53)
    with BuildSketch(Plane(origin=(12.2, 10, 16), x_dir=(-1, 0, 0), z_dir=(0, 0, 1)), Plane(origin=(-50.8, 10, 16), x_dir=(0, 1, 0), z_dir=(0, 0, 1))) as fillet7_piece_10:
        with BuildLine():
            CenterArc((FILLET7_R, -FILLET7_R), FILLET7_R, 90, 90)
            Line((0, -FILLET7_R), (0, 0))
            Line((0, 0), (FILLET7_R, 0))
        make_face()
    extrude(amount=60)
    with BuildSketch(Plane(origin=(-45.8, 10, 11), x_dir=(0, 0, 1), z_dir=(1, 0, 0)), Plane(origin=(7.2, 10, 6), x_dir=(0, 0, -1), z_dir=(-1, 0, 0))) as fillet7_piece_11:
        with BuildLine():
            CenterArc((FILLET7_R, -FILLET7_R), FILLET7_R, 90, 90)
            Line((0, -FILLET7_R), (0, 0))
            Line((0, 0), (FILLET7_R, 0))
        make_face()
    extrude(amount=53)
    with BuildSketch(Plane(origin=(7.2, 10, 16), x_dir=(0, 0, -1), z_dir=(-1, 0, 0))) as fillet7_piece_12:
        with BuildLine():
            CenterArc((5 - FILLET7_R, -FILLET7_R), FILLET7_R, 0, 90)
            Line((5, -FILLET7_R), (5, 0))
            Line((5, 0), (5 - FILLET7_R, 0))
        make_face()
    revolve(axis=Axis((7.2, 10, 16), (0, -1, 0)), revolution_arc=90)
    with BuildSketch(Plane(origin=(-45.8, 10, 16), x_dir=(-1, 0, 0), z_dir=(0, 0, 1))) as fillet7_piece_13:
        with BuildLine():
            CenterArc((5 - FILLET7_R, -FILLET7_R), FILLET7_R, 0, 90)
            Line((5, -FILLET7_R), (5, 0))
            Line((5, 0), (5 - FILLET7_R, 0))
        make_face()
    revolve(axis=Axis((-45.8, 10, 16), (0, -1, 0)), revolution_arc=90)
    with BuildSketch(Plane(origin=(-45.8, 10, 76), x_dir=(-1, 0, 0), z_dir=(0, 0, -1))) as fillet7_piece_14:
        with BuildLine():
            CenterArc((5 - FILLET7_R, FILLET7_R), FILLET7_R, 270, 90)
            Line((5 - FILLET7_R, 0), (5, 0))
            Line((5, 0), (5, FILLET7_R))
        make_face()
    revolve(axis=Axis((-45.8, 10, 76), (0, 1, 0)), revolution_arc=90)
    with BuildSketch(Plane(origin=(7.2, 10, 76), x_dir=(0, 0, 1), z_dir=(-1, 0, 0))) as fillet7_piece_15:
        with BuildLine():
            CenterArc((5 - FILLET7_R, FILLET7_R), FILLET7_R, 270, 90)
            Line((5, FILLET7_R), (5, 0))
            Line((5, 0), (5 - FILLET7_R, 0))
        make_face()
    revolve(axis=Axis((7.2, 10, 76), (0, 1, 0)), revolution_arc=90)
    with BuildSketch(Plane(origin=(-50.8, 10, -34), x_dir=(1, 0, 0), z_dir=(0, 0, 1))) as fillet7_piece_16:
        with BuildLine():
            CenterArc((FILLET7_R, FILLET7_R), FILLET7_R, 180, 90)
            Line((0, FILLET7_R), (0, 0))
            Line((0, 0), (FILLET7_R, 0))
        make_face()
    extrude(amount=35)
    with BuildSketch(Plane(origin=(12.2, 10, -34), x_dir=(-1, 0, 0), z_dir=(0, 0, 1))) as fillet7_piece_17:
        with BuildLine():
            CenterArc((FILLET7_R, -FILLET7_R), FILLET7_R, 90, 90)
            Line((0, -FILLET7_R), (0, 0))
            Line((0, 0), (FILLET7_R, 0))
        make_face()
    extrude(amount=35)
    with BuildSketch(Plane(origin=(7.2, 10, -34), x_dir=(0, 0, -1), z_dir=(-1, 0, 0))) as fillet7_piece_18:
        with BuildLine():
            CenterArc((5 - FILLET7_R, -FILLET7_R), FILLET7_R, 0, 90)
            Line((5, -FILLET7_R), (5, 0))
            Line((5, 0), (5 - FILLET7_R, 0))
        make_face()
    revolve(axis=Axis((7.2, 10, -34), (0, -1, 0)), revolution_arc=90)
    with BuildSketch(Plane(origin=(-45.8, 10, -34), x_dir=(0, 0, -1), z_dir=(1, 0, 0))) as fillet7_piece_19:
        with BuildLine():
            CenterArc((5 - FILLET7_R, FILLET7_R), FILLET7_R, 270, 90)
            Line((5, FILLET7_R), (5, 0))
            Line((5, 0), (5 - FILLET7_R, 0))
        make_face()
    revolve(axis=Axis((-45.8, 10, -34), (0, 1, 0)), revolution_arc=90)
    with BuildSketch(Plane(origin=(-45.8, 10, 1), x_dir=(-1, 0, 0), z_dir=(0, 0, -1))) as fillet7_piece_20:
        with BuildLine():
            CenterArc((5 - FILLET7_R, FILLET7_R), FILLET7_R, 270, 90)
            Line((5, FILLET7_R), (5, 0))
            Line((5, 0), (5 - FILLET7_R, 0))
        make_face()
    revolve(axis=Axis((-45.8, 10, 1), (0, 1, 0)), revolution_arc=90)
    with BuildSketch(Plane(origin=(7.2, 10, 1), x_dir=(1, 0, 0), z_dir=(0, 0, -1))) as fillet7_piece_21:
        with BuildLine():
            CenterArc((5 - FILLET7_R, -FILLET7_R), FILLET7_R, 0, 90)
            Line((5, -FILLET7_R), (5, 0))
            Line((5, 0), (5 - FILLET7_R, 0))
        make_face()
    revolve(axis=Axis((7.2, 10, 1), (0, -1, 0)), revolution_arc=90)
    with BuildSketch(Plane(origin=(-43.8, 10, 75), x_dir=(0, 0, 1), z_dir=(-1, 0, 0))) as fillet7_piece_22:
        with BuildLine():
            CenterArc((1.75 + FILLET7_R, FILLET7_R), FILLET7_R, 180, 90)
            Line((1.75, FILLET7_R), (1.75, 0))
            Line((1.75, 0), (1.75 + FILLET7_R, 0))
        make_face()
    revolve(axis=Axis((-43.8, 10, 75), (0, 1, 0)))
    with BuildSketch(Plane(origin=(5.2, 10, 75), x_dir=(0, 0, 1), z_dir=(-1, 0, 0))) as fillet7_piece_23:
        with BuildLine():
            CenterArc((1.75 + FILLET7_R, FILLET7_R), FILLET7_R, 180, 90)
            Line((1.75, FILLET7_R), (1.75, 0))
            Line((1.75, 0), (1.75 + FILLET7_R, 0))
        make_face()
    revolve(axis=Axis((5.2, 10, 75), (0, 1, 0)))
    with BuildSketch(Plane(origin=(-43.8, 10, 17), x_dir=(0, 0, 1), z_dir=(-1, 0, 0))) as fillet7_piece_24:
        with BuildLine():
            CenterArc((1.75 + FILLET7_R, FILLET7_R), FILLET7_R, 180, 90)
            Line((1.75, FILLET7_R), (1.75, 0))
            Line((1.75, 0), (1.75 + FILLET7_R, 0))
        make_face()
    revolve(axis=Axis((-43.8, 10, 17), (0, 1, 0)))
    with BuildSketch(Plane(origin=(5.2, 10, 16), x_dir=(0, 0, 1), z_dir=(-1, 0, 0))) as fillet7_piece_25:
        with BuildLine():
            CenterArc((1.75 + FILLET7_R, FILLET7_R), FILLET7_R, 180, 90)
            Line((1.75, FILLET7_R), (1.75, 0))
            Line((1.75, 0), (1.75 + FILLET7_R, 0))
        make_face()
    revolve(axis=Axis((5.2, 10, 16), (0, 1, 0)))
    with BuildSketch(Plane(origin=(-43.8, 10, -0.75), x_dir=(0, 0, 1), z_dir=(-1, 0, 0))) as fillet7_piece_26:
        with BuildLine():
            CenterArc((2 + FILLET7_R, FILLET7_R), FILLET7_R, 180, 90)
            Line((2 + FILLET7_R, 0), (2, 0))
            Line((2, 0), (2, FILLET7_R))
        make_face()
    revolve(axis=Axis((-43.8, 10, -0.75), (0, 1, 0)))
    with BuildSketch(Plane(origin=(-43.8, 10, -32.25), x_dir=(0, 0, 1), z_dir=(-1, 0, 0))) as fillet7_piece_27:
        with BuildLine():
            CenterArc((2 + FILLET7_R, FILLET7_R), FILLET7_R, 180, 90)
            Line((2, FILLET7_R), (2, 0))
            Line((2, 0), (2 + FILLET7_R, 0))
        make_face()
    revolve(axis=Axis((-43.8, 10, -32.25), (0, 1, 0)))

    # Sketch9 → Cut-Extrude5 (cut)
    with BuildSketch(Plane(origin=(0, 40, 0), x_dir=(1, 0, 0), z_dir=(0, 1, 0))):
        Polygon((73.26975164, 76.019868691), (-76.458420342, 76.019868691), (-76.458420342, -104.20986237), (73.26975164, -104.20986237), (73.26975164, -125.728653824), (128.612379706, -125.728653824), (128.612379706, 76.019868691), align=None)
    extrude(amount=-CUT_EXTRUDE5_DEPTH, mode=Mode.SUBTRACT)


solid = part_6.part
